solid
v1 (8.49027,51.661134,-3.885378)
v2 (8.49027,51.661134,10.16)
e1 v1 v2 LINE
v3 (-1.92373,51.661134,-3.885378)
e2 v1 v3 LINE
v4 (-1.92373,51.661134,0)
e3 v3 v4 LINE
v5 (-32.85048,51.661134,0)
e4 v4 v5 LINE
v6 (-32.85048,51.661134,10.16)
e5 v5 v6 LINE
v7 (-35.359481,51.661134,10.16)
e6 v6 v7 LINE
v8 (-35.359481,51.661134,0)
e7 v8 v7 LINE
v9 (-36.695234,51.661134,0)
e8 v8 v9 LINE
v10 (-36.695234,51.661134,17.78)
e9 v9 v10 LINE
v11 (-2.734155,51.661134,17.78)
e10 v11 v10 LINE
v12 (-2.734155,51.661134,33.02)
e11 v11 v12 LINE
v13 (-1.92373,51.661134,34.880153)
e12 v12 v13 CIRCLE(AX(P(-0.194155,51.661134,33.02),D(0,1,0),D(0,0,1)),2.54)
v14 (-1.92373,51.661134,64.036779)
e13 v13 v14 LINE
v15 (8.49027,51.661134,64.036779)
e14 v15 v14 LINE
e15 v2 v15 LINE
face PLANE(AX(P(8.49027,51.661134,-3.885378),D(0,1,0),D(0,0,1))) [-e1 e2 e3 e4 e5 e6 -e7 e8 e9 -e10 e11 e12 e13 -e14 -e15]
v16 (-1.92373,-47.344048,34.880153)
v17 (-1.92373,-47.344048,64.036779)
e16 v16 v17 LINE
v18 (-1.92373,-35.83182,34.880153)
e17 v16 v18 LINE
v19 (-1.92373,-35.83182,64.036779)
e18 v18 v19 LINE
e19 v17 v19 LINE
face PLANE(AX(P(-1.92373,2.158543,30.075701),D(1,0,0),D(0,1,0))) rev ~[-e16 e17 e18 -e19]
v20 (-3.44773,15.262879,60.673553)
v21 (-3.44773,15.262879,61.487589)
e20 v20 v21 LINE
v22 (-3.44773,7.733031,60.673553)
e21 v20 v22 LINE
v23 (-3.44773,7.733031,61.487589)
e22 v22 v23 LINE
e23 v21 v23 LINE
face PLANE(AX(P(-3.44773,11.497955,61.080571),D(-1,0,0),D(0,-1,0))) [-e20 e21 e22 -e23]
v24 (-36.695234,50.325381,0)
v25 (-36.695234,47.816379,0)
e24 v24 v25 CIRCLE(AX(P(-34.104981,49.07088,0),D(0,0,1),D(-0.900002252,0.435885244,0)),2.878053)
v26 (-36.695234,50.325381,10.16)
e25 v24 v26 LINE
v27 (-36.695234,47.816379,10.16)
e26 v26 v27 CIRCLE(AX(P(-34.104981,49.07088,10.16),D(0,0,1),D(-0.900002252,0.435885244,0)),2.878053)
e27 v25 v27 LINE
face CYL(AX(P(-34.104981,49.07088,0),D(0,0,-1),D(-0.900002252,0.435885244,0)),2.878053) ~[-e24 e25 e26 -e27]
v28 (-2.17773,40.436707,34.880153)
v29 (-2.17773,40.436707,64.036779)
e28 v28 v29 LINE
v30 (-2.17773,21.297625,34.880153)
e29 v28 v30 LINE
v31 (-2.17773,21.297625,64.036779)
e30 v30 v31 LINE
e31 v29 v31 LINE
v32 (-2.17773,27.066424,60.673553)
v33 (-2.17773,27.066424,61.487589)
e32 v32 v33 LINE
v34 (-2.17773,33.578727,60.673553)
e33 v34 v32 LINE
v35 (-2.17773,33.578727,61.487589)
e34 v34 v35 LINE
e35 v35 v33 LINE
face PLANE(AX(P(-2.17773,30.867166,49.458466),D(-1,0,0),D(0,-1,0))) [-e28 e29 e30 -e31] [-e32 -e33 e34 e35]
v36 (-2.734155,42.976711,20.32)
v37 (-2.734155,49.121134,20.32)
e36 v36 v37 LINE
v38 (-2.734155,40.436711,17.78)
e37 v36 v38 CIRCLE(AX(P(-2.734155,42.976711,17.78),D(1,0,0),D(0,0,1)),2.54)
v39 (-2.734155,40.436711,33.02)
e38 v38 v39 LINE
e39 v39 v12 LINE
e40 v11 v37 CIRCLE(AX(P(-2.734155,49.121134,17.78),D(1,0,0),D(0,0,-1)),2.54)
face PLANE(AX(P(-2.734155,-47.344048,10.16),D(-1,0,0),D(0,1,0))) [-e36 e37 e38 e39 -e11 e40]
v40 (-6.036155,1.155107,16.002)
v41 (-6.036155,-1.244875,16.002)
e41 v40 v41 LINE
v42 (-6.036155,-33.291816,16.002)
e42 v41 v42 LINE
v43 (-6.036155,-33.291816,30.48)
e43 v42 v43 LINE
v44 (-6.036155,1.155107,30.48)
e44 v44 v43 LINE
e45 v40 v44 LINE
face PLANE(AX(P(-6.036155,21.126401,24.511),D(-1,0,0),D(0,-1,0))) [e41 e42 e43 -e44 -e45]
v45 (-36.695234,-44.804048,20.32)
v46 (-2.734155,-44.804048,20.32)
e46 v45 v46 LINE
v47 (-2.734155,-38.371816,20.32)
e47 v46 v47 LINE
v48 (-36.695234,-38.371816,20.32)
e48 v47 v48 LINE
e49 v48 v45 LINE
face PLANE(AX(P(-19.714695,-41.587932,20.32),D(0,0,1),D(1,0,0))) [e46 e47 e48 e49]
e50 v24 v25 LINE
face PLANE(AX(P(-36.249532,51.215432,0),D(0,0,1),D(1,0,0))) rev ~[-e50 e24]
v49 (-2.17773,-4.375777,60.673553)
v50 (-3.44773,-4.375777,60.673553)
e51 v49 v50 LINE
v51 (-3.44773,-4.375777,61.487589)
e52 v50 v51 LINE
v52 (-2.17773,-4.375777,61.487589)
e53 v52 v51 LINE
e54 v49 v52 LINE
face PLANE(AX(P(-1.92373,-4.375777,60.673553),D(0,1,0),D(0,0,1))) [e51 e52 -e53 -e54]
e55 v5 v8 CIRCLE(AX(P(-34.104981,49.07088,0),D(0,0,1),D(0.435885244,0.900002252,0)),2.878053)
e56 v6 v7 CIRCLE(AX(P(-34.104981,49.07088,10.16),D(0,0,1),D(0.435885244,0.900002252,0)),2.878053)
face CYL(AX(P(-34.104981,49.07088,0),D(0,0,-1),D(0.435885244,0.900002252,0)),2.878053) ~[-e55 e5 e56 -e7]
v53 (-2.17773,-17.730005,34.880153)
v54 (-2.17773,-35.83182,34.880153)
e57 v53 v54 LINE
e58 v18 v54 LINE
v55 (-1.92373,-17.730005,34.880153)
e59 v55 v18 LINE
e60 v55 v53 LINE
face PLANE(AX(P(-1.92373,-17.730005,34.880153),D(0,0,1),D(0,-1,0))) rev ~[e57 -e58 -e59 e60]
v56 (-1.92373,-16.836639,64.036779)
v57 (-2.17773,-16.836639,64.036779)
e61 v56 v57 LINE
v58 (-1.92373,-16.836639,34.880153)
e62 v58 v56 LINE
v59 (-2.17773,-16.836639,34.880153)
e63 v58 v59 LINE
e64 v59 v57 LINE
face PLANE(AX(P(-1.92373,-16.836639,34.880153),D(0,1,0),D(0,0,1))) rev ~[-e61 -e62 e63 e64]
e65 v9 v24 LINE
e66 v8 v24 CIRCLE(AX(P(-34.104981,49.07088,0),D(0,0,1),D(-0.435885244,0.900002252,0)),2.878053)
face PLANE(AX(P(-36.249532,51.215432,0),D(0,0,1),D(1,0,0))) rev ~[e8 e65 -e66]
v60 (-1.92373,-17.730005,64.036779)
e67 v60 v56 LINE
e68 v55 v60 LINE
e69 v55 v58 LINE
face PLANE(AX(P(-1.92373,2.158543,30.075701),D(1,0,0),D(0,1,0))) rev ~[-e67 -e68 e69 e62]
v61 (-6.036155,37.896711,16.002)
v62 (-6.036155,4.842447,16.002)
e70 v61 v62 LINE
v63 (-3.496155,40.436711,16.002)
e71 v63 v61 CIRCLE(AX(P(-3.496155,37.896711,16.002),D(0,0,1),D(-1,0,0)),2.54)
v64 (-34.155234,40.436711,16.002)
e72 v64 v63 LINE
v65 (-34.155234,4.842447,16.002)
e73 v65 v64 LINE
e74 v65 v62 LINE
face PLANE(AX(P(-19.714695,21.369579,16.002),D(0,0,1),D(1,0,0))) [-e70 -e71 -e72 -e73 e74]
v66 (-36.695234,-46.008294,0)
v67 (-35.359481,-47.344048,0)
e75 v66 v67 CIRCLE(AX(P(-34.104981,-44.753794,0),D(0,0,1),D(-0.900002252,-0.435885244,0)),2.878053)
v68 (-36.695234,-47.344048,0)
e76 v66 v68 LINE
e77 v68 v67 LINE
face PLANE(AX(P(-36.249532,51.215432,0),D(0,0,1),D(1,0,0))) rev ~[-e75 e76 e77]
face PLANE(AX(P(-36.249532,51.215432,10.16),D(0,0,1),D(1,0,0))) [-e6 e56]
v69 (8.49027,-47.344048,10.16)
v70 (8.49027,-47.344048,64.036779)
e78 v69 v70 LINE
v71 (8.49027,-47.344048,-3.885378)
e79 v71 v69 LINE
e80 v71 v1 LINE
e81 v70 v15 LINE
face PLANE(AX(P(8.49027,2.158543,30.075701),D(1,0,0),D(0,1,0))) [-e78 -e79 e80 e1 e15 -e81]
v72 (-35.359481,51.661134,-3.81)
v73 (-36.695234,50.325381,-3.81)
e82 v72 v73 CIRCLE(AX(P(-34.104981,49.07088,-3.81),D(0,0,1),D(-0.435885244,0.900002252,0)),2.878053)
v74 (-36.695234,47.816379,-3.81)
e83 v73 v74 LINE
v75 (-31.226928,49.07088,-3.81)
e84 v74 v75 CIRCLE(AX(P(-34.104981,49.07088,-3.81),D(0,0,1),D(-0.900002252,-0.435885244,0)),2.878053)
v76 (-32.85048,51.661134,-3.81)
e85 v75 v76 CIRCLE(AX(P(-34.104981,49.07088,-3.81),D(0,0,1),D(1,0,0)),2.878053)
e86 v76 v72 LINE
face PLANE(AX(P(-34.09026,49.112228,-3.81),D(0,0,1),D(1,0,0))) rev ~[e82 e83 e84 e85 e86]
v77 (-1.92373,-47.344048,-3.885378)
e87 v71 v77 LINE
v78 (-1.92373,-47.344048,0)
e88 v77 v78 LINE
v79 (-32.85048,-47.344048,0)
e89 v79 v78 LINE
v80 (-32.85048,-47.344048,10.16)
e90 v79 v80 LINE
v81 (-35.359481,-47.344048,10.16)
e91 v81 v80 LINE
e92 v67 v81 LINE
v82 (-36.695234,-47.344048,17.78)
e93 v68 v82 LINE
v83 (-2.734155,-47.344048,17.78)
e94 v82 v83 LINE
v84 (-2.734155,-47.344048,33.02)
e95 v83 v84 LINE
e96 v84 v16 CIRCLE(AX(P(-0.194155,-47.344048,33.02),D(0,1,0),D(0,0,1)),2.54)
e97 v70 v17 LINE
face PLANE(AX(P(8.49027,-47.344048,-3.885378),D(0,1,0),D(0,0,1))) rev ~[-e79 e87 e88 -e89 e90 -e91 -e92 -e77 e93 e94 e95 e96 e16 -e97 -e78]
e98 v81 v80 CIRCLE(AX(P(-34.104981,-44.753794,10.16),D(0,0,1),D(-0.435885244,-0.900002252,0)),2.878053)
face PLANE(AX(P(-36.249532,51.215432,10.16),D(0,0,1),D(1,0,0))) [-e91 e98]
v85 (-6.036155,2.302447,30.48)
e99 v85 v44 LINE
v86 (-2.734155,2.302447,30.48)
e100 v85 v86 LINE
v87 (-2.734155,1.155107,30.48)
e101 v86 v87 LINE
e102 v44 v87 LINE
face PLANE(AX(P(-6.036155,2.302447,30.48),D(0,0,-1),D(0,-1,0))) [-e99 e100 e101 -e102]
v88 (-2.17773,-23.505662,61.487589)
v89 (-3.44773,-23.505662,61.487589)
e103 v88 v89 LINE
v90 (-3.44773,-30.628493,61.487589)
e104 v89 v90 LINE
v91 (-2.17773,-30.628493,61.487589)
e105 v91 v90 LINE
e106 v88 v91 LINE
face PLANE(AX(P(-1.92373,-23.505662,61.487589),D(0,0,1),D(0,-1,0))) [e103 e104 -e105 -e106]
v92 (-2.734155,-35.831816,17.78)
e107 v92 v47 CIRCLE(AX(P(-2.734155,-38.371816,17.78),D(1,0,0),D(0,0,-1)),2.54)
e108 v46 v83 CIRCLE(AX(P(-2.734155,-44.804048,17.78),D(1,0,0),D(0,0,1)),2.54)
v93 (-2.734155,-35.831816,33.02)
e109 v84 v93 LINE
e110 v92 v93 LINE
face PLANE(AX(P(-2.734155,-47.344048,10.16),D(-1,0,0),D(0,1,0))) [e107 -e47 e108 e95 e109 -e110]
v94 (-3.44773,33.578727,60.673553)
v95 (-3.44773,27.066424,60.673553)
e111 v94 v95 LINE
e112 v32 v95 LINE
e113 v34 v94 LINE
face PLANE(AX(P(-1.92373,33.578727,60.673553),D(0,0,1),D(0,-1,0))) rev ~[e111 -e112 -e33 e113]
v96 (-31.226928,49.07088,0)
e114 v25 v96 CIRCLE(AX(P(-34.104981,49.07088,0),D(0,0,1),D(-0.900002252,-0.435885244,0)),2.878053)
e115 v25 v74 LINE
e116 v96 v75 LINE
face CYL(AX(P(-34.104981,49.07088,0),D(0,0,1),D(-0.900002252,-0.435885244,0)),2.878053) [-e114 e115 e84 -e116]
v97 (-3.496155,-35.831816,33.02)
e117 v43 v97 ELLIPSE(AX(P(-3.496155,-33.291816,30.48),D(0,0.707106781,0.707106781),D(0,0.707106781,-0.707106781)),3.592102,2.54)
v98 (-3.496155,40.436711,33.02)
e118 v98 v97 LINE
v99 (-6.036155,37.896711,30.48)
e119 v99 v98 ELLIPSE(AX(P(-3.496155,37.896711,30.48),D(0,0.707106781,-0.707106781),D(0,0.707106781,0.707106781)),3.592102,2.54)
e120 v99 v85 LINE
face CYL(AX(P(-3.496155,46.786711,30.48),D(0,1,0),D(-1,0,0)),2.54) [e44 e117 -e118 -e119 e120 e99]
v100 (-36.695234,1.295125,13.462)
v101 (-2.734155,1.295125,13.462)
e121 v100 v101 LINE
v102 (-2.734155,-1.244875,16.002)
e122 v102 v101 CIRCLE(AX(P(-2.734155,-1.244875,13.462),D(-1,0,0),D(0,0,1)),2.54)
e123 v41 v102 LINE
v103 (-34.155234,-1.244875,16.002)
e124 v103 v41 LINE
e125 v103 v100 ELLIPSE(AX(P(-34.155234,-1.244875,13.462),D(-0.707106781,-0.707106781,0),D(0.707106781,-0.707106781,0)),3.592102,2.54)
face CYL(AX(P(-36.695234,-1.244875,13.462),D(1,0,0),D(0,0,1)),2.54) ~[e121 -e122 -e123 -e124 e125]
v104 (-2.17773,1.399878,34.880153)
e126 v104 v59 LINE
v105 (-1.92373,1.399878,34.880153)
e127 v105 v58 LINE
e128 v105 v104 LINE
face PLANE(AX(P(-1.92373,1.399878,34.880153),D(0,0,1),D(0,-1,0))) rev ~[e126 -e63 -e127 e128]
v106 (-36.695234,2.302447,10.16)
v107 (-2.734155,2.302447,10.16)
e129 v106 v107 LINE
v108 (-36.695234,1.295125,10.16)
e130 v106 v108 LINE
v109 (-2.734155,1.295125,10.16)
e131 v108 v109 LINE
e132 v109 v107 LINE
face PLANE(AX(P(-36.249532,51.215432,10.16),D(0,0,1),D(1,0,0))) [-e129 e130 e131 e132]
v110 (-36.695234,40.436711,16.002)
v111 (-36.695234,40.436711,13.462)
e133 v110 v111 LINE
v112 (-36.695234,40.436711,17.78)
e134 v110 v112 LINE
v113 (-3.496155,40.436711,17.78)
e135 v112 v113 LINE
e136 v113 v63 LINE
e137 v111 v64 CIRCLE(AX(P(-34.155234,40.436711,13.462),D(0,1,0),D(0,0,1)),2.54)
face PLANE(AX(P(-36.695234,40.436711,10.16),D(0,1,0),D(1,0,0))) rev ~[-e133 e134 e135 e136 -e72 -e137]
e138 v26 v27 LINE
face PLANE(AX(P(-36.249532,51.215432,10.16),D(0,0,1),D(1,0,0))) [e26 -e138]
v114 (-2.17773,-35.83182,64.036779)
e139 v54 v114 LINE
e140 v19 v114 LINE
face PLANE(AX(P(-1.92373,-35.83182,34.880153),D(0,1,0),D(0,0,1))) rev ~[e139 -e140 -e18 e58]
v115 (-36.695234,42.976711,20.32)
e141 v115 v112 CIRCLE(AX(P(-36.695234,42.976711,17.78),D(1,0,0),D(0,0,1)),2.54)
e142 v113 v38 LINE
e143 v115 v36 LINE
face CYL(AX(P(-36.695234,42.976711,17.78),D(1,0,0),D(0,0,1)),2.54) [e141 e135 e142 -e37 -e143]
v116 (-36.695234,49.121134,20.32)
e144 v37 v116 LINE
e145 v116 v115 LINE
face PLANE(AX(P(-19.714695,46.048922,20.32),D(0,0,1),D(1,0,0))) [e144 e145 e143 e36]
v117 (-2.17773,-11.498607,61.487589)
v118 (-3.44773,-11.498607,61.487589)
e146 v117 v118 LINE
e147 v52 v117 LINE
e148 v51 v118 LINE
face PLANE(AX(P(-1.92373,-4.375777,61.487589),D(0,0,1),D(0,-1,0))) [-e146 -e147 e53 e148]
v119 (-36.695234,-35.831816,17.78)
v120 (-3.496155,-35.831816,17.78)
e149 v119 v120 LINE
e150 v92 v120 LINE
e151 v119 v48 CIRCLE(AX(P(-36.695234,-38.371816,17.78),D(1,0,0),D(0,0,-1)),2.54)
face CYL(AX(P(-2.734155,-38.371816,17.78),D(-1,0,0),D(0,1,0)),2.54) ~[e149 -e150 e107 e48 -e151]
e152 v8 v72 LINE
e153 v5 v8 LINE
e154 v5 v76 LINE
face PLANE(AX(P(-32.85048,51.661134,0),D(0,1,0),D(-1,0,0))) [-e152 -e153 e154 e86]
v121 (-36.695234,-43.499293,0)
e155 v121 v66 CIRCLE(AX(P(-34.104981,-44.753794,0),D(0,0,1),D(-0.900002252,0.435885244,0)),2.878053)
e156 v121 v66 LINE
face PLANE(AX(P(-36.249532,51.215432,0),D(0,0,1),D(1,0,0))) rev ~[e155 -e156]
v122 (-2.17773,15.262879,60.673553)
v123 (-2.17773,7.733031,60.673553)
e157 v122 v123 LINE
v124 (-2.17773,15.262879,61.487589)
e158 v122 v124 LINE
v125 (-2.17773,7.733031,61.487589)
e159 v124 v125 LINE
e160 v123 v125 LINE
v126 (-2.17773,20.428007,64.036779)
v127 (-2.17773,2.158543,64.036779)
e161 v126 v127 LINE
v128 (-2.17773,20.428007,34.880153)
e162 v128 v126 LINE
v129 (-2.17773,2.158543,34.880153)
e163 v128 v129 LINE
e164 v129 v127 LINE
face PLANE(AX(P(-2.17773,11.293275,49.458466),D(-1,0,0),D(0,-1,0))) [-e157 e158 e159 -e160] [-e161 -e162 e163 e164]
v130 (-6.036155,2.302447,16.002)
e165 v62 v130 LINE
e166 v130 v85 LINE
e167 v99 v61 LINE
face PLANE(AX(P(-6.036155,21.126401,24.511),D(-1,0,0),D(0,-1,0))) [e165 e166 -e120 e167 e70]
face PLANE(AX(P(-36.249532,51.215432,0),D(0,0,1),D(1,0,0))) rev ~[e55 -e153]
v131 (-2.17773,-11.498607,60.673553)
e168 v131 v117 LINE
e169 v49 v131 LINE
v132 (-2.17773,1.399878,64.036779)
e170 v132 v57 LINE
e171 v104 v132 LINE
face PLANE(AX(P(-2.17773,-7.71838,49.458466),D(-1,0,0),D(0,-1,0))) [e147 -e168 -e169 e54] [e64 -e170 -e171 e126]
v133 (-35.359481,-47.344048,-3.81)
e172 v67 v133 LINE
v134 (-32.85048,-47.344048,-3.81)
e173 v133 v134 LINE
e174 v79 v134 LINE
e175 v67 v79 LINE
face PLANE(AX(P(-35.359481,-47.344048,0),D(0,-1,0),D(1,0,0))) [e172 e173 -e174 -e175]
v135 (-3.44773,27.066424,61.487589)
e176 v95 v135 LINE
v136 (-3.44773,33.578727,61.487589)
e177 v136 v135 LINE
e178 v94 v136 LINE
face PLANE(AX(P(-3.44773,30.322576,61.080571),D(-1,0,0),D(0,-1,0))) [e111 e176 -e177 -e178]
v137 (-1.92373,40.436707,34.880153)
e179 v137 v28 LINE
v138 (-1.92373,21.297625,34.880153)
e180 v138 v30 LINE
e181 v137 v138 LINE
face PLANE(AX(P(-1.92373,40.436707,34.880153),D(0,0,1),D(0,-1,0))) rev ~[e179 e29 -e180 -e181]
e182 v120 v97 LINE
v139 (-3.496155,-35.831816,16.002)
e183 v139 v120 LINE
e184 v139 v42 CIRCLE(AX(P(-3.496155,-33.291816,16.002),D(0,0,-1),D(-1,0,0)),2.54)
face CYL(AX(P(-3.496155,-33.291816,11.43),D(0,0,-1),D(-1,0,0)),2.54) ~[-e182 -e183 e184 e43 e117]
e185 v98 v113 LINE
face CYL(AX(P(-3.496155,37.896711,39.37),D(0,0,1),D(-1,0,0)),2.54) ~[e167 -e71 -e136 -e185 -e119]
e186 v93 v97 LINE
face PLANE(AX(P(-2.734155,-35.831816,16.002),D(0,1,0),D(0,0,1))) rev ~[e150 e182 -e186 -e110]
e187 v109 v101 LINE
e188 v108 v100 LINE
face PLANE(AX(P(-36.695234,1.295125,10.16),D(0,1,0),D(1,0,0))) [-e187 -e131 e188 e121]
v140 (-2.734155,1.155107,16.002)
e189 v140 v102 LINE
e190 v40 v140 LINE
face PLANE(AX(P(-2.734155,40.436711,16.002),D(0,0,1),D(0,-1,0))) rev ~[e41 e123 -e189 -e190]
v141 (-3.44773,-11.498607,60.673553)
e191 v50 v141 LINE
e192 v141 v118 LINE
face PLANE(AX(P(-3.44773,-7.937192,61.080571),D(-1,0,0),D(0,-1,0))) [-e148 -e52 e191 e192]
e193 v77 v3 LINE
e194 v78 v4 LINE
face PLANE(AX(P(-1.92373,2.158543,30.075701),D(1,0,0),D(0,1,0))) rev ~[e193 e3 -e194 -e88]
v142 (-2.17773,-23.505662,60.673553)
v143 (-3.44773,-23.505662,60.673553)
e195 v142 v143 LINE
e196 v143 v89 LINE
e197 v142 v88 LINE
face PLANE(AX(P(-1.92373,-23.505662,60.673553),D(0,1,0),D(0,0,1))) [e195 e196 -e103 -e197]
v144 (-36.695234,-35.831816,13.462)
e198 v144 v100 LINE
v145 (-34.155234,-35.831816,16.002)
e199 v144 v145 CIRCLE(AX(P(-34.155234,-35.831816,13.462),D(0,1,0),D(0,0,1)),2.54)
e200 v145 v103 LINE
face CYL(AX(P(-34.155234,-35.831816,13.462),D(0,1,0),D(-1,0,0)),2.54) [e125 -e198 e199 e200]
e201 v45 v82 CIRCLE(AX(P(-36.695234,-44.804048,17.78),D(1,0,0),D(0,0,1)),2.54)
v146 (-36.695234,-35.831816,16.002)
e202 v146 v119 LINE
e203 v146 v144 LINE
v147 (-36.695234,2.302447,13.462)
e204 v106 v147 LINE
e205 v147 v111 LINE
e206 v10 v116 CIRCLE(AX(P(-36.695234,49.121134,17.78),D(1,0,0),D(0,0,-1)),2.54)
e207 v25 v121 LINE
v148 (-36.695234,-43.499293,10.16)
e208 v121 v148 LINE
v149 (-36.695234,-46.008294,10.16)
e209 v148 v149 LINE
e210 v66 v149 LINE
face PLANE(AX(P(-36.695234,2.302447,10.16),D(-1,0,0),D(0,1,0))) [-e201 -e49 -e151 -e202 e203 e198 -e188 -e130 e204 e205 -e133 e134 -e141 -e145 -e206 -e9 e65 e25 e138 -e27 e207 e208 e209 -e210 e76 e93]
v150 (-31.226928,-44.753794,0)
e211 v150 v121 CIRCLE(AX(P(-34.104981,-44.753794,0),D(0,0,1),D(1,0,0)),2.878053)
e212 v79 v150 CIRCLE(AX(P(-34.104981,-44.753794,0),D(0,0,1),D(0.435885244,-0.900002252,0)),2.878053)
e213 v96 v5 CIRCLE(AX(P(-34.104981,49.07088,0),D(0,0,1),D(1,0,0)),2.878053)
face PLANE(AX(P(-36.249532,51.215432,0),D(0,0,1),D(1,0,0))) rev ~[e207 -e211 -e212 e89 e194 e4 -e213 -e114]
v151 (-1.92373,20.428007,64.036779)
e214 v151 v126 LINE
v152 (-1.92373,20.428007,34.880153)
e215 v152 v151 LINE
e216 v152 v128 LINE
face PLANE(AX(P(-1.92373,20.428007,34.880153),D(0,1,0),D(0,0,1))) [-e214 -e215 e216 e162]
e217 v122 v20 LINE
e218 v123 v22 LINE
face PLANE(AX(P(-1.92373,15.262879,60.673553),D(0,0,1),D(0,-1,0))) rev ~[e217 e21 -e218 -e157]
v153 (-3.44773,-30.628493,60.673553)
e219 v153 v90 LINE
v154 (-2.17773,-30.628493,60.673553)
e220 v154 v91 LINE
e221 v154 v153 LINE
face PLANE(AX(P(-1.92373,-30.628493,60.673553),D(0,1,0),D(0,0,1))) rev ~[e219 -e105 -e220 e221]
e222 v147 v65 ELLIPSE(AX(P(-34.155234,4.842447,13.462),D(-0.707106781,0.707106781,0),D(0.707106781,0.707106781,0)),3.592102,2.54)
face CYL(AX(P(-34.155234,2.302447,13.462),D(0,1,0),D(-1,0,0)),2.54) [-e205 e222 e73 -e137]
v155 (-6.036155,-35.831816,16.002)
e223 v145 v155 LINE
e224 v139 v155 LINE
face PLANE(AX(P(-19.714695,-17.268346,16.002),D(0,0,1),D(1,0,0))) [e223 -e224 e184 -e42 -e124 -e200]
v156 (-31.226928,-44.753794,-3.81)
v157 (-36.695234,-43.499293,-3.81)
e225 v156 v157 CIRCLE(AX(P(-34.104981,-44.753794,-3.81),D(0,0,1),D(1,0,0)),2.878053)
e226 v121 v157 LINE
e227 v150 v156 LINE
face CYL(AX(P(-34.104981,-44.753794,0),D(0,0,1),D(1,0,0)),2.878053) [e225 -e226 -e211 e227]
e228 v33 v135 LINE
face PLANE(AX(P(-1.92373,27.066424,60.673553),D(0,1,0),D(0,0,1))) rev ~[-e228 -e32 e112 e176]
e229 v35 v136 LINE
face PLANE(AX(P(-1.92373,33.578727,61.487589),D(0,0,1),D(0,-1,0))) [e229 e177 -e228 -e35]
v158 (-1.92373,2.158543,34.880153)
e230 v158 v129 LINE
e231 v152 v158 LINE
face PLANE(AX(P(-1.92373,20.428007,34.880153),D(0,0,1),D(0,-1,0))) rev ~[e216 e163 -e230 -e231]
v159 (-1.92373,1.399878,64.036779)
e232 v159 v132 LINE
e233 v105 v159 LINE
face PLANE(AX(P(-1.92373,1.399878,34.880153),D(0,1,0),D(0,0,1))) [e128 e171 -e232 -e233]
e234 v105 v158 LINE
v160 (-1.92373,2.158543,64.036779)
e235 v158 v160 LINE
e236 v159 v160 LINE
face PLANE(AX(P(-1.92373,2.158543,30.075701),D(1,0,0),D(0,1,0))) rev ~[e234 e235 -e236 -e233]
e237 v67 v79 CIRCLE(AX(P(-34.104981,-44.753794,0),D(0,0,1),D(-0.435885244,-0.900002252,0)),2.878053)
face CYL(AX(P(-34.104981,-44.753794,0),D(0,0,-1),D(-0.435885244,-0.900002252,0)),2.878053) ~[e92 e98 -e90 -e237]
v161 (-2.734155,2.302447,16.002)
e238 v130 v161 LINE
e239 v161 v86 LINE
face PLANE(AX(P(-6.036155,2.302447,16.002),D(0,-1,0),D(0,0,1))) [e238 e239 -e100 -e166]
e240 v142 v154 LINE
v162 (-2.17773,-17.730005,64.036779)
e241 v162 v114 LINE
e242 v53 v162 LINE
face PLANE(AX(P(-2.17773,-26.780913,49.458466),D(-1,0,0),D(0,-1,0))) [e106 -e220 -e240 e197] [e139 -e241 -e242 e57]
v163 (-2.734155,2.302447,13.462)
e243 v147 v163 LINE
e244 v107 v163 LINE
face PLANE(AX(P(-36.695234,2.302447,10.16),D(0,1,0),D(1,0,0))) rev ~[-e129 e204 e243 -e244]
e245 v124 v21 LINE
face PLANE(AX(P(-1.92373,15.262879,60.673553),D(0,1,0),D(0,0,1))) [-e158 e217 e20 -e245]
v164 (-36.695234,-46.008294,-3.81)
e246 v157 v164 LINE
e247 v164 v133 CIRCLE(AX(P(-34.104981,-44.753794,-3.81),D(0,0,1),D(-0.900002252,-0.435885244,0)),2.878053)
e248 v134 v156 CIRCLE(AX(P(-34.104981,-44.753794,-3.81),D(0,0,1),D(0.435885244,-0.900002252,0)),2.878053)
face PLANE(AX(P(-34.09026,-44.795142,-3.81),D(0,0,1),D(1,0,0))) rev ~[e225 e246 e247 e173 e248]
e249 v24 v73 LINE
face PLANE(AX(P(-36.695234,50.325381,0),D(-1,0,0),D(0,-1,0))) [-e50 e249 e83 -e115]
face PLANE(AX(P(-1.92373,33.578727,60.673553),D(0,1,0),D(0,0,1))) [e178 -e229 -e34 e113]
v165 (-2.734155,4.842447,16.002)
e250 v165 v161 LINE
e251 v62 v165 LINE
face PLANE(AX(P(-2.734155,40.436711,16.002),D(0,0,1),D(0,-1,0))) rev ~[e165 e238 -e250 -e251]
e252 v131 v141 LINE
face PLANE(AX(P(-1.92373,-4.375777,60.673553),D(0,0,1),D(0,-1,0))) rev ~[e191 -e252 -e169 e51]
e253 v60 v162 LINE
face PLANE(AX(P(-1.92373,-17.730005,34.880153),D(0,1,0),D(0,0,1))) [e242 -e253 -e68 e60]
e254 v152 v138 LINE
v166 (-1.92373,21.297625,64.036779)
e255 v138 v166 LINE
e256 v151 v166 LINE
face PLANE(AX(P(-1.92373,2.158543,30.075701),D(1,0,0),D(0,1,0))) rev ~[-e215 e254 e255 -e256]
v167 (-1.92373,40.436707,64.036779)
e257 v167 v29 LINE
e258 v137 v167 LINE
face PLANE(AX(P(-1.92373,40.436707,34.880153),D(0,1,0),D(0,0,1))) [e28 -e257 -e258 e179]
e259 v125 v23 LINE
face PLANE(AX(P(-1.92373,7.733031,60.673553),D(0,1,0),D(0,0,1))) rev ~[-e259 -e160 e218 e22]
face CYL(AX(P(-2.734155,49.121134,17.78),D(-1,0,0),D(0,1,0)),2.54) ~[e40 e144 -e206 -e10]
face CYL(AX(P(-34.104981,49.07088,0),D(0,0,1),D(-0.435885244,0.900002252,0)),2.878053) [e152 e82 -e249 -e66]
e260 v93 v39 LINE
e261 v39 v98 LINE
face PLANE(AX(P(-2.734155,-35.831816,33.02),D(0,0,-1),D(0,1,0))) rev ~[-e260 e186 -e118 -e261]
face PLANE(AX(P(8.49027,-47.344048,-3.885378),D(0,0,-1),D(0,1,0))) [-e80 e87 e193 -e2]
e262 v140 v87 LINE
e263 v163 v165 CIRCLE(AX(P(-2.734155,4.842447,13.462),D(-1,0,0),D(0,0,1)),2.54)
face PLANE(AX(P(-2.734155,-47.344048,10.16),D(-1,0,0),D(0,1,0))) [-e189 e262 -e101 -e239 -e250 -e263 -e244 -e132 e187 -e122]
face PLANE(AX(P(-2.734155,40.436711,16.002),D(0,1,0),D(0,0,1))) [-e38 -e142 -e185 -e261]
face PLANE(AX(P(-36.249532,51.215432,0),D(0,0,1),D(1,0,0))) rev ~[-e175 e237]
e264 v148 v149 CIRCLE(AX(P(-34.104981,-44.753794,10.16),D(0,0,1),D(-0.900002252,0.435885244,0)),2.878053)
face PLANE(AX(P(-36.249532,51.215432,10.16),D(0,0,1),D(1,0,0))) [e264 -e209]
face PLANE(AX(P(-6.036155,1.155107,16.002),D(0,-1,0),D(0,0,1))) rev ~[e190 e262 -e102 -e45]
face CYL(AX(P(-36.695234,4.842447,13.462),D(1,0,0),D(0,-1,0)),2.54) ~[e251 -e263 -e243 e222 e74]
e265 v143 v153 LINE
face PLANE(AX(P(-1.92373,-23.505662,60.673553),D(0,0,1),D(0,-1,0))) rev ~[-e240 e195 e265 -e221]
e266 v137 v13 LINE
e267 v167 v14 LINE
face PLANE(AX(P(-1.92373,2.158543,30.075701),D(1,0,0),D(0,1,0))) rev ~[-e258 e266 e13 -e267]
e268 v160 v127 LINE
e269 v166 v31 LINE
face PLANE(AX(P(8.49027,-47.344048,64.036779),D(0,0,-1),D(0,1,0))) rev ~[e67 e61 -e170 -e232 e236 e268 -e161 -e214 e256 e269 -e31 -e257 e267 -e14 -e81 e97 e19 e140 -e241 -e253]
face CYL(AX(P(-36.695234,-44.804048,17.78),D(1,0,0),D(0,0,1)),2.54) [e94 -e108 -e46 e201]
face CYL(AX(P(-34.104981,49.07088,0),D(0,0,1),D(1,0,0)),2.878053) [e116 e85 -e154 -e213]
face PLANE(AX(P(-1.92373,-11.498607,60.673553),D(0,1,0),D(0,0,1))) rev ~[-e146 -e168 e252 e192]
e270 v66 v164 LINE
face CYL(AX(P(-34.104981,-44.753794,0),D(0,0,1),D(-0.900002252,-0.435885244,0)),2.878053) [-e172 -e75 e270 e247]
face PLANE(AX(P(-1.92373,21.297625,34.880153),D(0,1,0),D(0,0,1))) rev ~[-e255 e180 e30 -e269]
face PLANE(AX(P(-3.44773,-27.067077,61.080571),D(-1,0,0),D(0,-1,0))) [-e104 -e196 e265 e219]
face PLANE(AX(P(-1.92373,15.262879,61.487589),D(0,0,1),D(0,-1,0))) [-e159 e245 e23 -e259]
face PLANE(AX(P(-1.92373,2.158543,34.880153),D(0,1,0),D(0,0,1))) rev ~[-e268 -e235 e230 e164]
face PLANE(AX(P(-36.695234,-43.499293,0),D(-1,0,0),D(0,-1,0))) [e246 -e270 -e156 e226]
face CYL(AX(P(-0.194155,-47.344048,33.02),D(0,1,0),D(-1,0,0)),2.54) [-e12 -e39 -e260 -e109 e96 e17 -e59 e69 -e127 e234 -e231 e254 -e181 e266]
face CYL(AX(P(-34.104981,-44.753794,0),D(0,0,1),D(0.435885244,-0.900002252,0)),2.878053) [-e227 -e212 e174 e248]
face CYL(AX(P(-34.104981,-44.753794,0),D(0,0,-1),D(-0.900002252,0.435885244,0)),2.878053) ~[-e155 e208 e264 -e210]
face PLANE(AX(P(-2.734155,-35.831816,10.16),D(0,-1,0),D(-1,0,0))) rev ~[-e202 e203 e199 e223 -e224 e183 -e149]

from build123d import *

# Parameters (mm, degrees)
F0_W          = 22.5927522406
F0_H          = 49.5025906712
F1_DEPTH      = 10.16
F2_DEPTH      = 3.81
F3_W          = 11.2244246993
F3_H          = 99.0051813424
F4_DEPTH      = 25.4
F6_DEPTH      = 10.16
F7_R          = 2.54
F8_W          = 33.9610797819
F8_H          = 38.1342638284
F8_H_2        = 37.1269418392
F9_DEPTH      = 5.842
F10_R         = 2.54
F11_W         = 99.0051813424
F11_H         = 67.9221570026
F12_DEPTH     = 10.414
F13_W         = 38.620619569
F13_H         = 17.018
F13_W_2       = 37.6479080878
F14_DEPTH     = 3.302
F15_T1_DEPTH  = 88.9685276568
F15_T6_DEPTH  = 27.94
F15_T11_DEPTH = 27.94
F16_W         = 1.1473407503
F16_H         = 14.478
F17_DEPTH     = 3.302
F18_W         = 19.139082171
F18_H         = 29.1566260799
F18_W_2       = 6.5123029053
F18_H_2       = 0.8140355349
F18_W_3       = 18.2694643736
F18_W_4       = 7.5298482552
F18_W_5       = 18.2365168585
F18_W_6       = 7.1228295565
F18_W_7       = 18.1018151343
F18_W_8       = 7.1228314191
F19_DEPTH     = 0.254
F20_DEPTH     = 1.524


# Not quite as in the source:
# - a fillet or chamfer that OpenCascade refuses, or shapes differently, is made with other operations: its cross-section is extruded or revolved along the edge and cut away or added
# - a feature names something its author has since deleted; it is built from what else it names


with BuildPart() as f1:
    # F0 (on Top) → F1 (new body)
    with BuildSketch(Plane.XY):
        with BuildLine():
            Line((-35.3594812499, 51.6611337662), (-36.6952344775, 51.6611337662))
            Line((-36.6952344775, 51.6611337662), (-36.6952344775, 50.3253805386))
            ThreePointArc((-36.6952344775, 50.3253805386), (-36.1400711383, 51.105970427), (-35.3594812499, 51.6611337662))
        make_face()
        with BuildLine():
            ThreePointArc((-32.8504798068, 51.6611337662), (-34.1049805284, 51.9489325583), (-35.3594812499, 51.6611337662))
            Line((-35.3594812499, 51.6611337662), (-32.8504798068, 51.6611337662))
        make_face()
        with BuildLine():
            Line((-32.8504798068, 51.6611337662), (-35.3594812499, 51.6611337662))
            ThreePointArc((-35.3594812499, 51.6611337662), (-36.1400711383, 51.105970427), (-36.6952344775, 50.3253805386))
            Line((-36.6952344775, 50.3253805386), (-36.6952344775, 47.8163790954))
            ThreePointArc((-36.6952344775, 47.8163790954), (-33.4614356183, 46.2656993361), (-31.2269277871, 49.070879817))
            ThreePointArc((-31.2269277871, 49.070879817), (-31.6663634179, 50.5993869876), (-32.8504798068, 51.6611337662))
        make_face()
        with BuildLine():
            Line((-36.6952344775, 47.8163790954), (-36.6952344775, 50.3253805386))
            ThreePointArc((-36.6952344775, 50.3253805386), (-36.9830332696, 49.070879817), (-36.6952344775, 47.8163790954))
        make_face()
        with BuildLine():
            Line((-14.1024822369, 51.6611337662), (-32.8504798068, 51.6611337662))
            ThreePointArc((-32.8504798068, 51.6611337662), (-31.6663634179, 50.5993869876), (-31.2269277871, 49.070879817))
            ThreePointArc((-31.2269277871, 49.070879817), (-33.4614356183, 46.2656993361), (-36.6952344775, 47.8163790954))
            Line((-36.6952344775, 47.8163790954), (-36.6952344775, 2.158543095))
            Line((-36.6952344775, 2.158543095), (-14.1024822369, 2.158543095))
            Line((-14.1024822369, 2.158543095), (-14.1024822369, 51.6611337662))
        make_face()
        with Locations((-2.8061061166, 26.9098384306)):
            Rectangle(F0_W, F0_H)
        with BuildLine():
            Line((-14.1024822369, 2.158543095), (-36.6952344775, 2.158543095))
            Line((-36.6952344775, 2.158543095), (-36.6952344775, -43.4992929054))
            ThreePointArc((-36.6952344775, -43.4992929054), (-33.4614356183, -41.9486131461), (-31.2269277871, -44.753793627))
            ThreePointArc((-31.2269277871, -44.753793627), (-31.6663634179, -46.2823007976), (-32.8504798068, -47.3440475762))
            Line((-32.8504798068, -47.3440475762), (-14.1024822369, -47.3440475762))
            Line((-14.1024822369, -47.3440475762), (-14.1024822369, 2.158543095))
        make_face()
        with Locations((-2.8061061166, -22.5927522406)):
            Rectangle(F0_W, F0_H)
        with BuildLine():
            ThreePointArc((-31.2269277871, -44.753793627), (-33.4614356183, -41.9486131461), (-36.6952344775, -43.4992929054))
            Line((-36.6952344775, -43.4992929054), (-36.6952344775, -46.0082943486))
            ThreePointArc((-36.6952344775, -46.0082943486), (-36.1400711383, -46.788884237), (-35.3594812499, -47.3440475762))
            Line((-35.3594812499, -47.3440475762), (-32.8504798068, -47.3440475762))
            ThreePointArc((-32.8504798068, -47.3440475762), (-31.6663634179, -46.2823007976), (-31.2269277871, -44.753793627))
        make_face()
        with BuildLine():
            Line((-36.6952344775, -46.0082943486), (-36.6952344775, -43.4992929054))
            ThreePointArc((-36.6952344775, -43.4992929054), (-36.9830332696, -44.753793627), (-36.6952344775, -46.0082943486))
        make_face()
        with BuildLine():
            ThreePointArc((-35.3594812499, -47.3440475762), (-36.1400711383, -46.788884237), (-36.6952344775, -46.0082943486))
            Line((-36.6952344775, -46.0082943486), (-36.6952344775, -47.3440475762))
            Line((-36.6952344775, -47.3440475762), (-35.3594812499, -47.3440475762))
        make_face()
        with BuildLine():
            ThreePointArc((-35.3594812499, -47.3440475762), (-34.1049805284, -47.6318463683), (-32.8504798068, -47.3440475762))
            Line((-32.8504798068, -47.3440475762), (-35.3594812499, -47.3440475762))
        make_face()
    extrude(amount=F1_DEPTH)

    # F0 (on Top) → F2 (join)
    with BuildSketch(Plane.XY):
        with BuildLine():
            Line((-32.8504798068, 51.6611337662), (-35.3594812499, 51.6611337662))
            ThreePointArc((-35.3594812499, 51.6611337662), (-36.1400711383, 51.105970427), (-36.6952344775, 50.3253805386))
            Line((-36.6952344775, 50.3253805386), (-36.6952344775, 47.8163790954))
            ThreePointArc((-36.6952344775, 47.8163790954), (-33.4614356183, 46.2656993361), (-31.2269277871, 49.070879817))
            ThreePointArc((-31.2269277871, 49.070879817), (-31.6663634179, 50.5993869876), (-32.8504798068, 51.6611337662))
        make_face()
        with BuildLine():
            ThreePointArc((-31.2269277871, -44.753793627), (-33.4614356183, -41.9486131461), (-36.6952344775, -43.4992929054))
            Line((-36.6952344775, -43.4992929054), (-36.6952344775, -46.0082943486))
            ThreePointArc((-36.6952344775, -46.0082943486), (-36.1400711383, -46.788884237), (-35.3594812499, -47.3440475762))
            Line((-35.3594812499, -47.3440475762), (-32.8504798068, -47.3440475762))
            ThreePointArc((-32.8504798068, -47.3440475762), (-31.6663634179, -46.2823007976), (-31.2269277871, -44.753793627))
        make_face()
    extrude(amount=-F2_DEPTH)

    # F3 (on face) → F4 (join)
    with BuildSketch(Plane.XY.offset(10.16)):
        with Locations((2.878057654, 2.158543095)):
            Rectangle(F3_W, F3_H)
    extrude(amount=F4_DEPTH)

    # F5 (on face) → F6 (join)
    with BuildSketch(Plane.XY.offset(10.16)):
        Polygon((-2.7341546956, 40.4367111623), (-2.7341546956, 51.6611337662), (-32.8504798068, 51.6611337662), (-35.3594812499, 51.6611337662), (-36.6952344775, 51.6611337662), (-36.6952344775, 50.3253805386), (-36.6952344775, 47.8163790954), (-36.6952344775, 40.4367111623), align=None)
        Polygon((-2.7341546956, -47.3440475762), (-2.7341546956, -35.8318164945), (-36.6952344775, -35.8318164945), (-36.6952344775, -43.4992929054), (-36.6952344775, -46.0082943486), (-36.6952344775, -47.3440475762), (-35.3594812499, -47.3440475762), (-32.8504798068, -47.3440475762), align=None)
    extrude(amount=F6_DEPTH)

    # F7
    f7_edges = [f1.edges().sort_by_distance(p)[0] for p in [
        (-2.734155, 2.158543, 35.56),
        (-19.714695, -35.831816, 20.32),
        (-19.714695, -47.344048, 20.32),
        (-19.714695, 51.661134, 20.32),
        (-19.714695, 40.436711, 20.32),
    ]]
    fillet(f7_edges, radius=F7_R)

    # F8 (on face) → F9 (join)
    with BuildSketch(Plane.XY.offset(10.16)):
        with Locations((-19.7146945866, 21.3695792481)):
            Rectangle(F8_W, F8_H)
        with Locations((-19.7146945866, -17.2683455748)):
            Rectangle(F8_W, F8_H_2)
    extrude(amount=F9_DEPTH)

    # F10
    f10_edges = [f1.edges().sort_by_distance(p)[0] for p in [
        (-19.714695, 1.295125, 16.002),
        (-19.714695, 2.302447, 16.002),
        (-36.695234, -17.268346, 16.002),
        (-36.695234, 21.369579, 16.002),
    ]]
    fillet(f10_edges, radius=F10_R)

    # F11 (on face) → F12 (join)
    with BuildSketch(Plane.YZ.offset(8.4902700037)):
        with Locations((2.158543095, 30.0757006044)):
            Rectangle(F11_W, F11_H)
    extrude(amount=-F12_DEPTH)

    # F13 (on face) → F14 (join)
    with BuildSketch(Plane(origin=(-2.7341546956, 0, 0), x_dir=(0, -1, 0), z_dir=(-1, 0, 0))):
        with Locations((-21.1264013778, 24.511)):
            Rectangle(F13_W, F13_H)
        with Locations((17.0078624506, 24.511)):
            Rectangle(F13_W_2, F13_H)
    extrude(amount=F14_DEPTH)

    # F15: fillet of radius 2.54 on 3 edges, made by hand

    # F15_s2 → F15_t1 (cut)
    with BuildSketch(Plane.XZ.offset(-46.7867111623)):
        with BuildLine():
            ThreePointArc((-6.0361546956, 30.48), (-5.2922059199, 32.2760512242), (-3.4961546956, 33.02))
            Line((-3.4961546956, 33.02), (-6.0361546956, 33.02))
            Line((-6.0361546956, 33.02), (-6.0361546956, 30.48))
        make_face()
    extrude(amount=F15_T1_DEPTH, mode=Mode.SUBTRACT)


with BuildPart() as f15_tool4:
    # F15_s5 → F15_t6 (new body)
    with BuildSketch(Plane.XY.offset(39.37)):
        with BuildLine():
            ThreePointArc((-6.0361546956, 37.8967111623), (-5.2922059199, 39.6927623865), (-3.4961546956, 40.4367111623))
            Line((-3.4961546956, 40.4367111623), (-6.0361546956, 40.4367111623))
            Line((-6.0361546956, 40.4367111623), (-6.0361546956, 37.8967111623))
        make_face()
    extrude(amount=-F15_T6_DEPTH)

    split(bisect_by=Plane.XY.offset(16.002), keep=Keep.TOP)


with BuildPart() as f1_1:
    add(f1.part)

    # F15_t3: cut F15_tool4
    add(f15_tool4.part, mode=Mode.SUBTRACT)


with BuildPart() as f15_tool9:
    # F15_s10 → F15_t11 (new body)
    with BuildSketch(Plane.XY.offset(11.43)):
        with BuildLine():
            ThreePointArc((-6.0361546956, -33.2918164945), (-5.2922059199, -35.0878677187), (-3.4961546956, -35.8318164945))
            Line((-3.4961546956, -35.8318164945), (-6.0361546956, -35.8318164945))
            Line((-6.0361546956, -35.8318164945), (-6.0361546956, -33.2918164945))
        make_face()
    extrude(amount=F15_T11_DEPTH)

    split(bisect_by=Plane.XY.offset(16.002), keep=Keep.TOP)


with BuildPart() as f1_2:
    add(f1_1.part)

    # F15_t8: cut F15_tool9
    add(f15_tool9.part, mode=Mode.SUBTRACT)

    # F16 (on face) → F17 (cut)
    with BuildSketch(Plane(origin=(-6.0361546956, 0, 0), x_dir=(0, -1, 0), z_dir=(-1, 0, 0))):
        with Locations((-1.7287769588, 23.241)):
            Rectangle(F16_W, F16_H)
    extrude(amount=-F17_DEPTH, mode=Mode.SUBTRACT)

    # F18 (on face) → F19 (join)
    with BuildSketch(Plane(origin=(-1.9237299963, 0, 0), x_dir=(0, -1, 0), z_dir=(-1, 0, 0))):
        with Locations((-30.8671663515, 49.4584660657)):
            Rectangle(F18_W, F18_H)
        with Locations((-30.3225759417, 61.080571264)):
            Rectangle(F18_W_2, F18_H_2, mode=Mode.SUBTRACT)
        with Locations((-11.2932752818, 49.4584660657)):
            Rectangle(F18_W_3, F18_H)
        with Locations((-11.4979553036, 61.080571264)):
            Rectangle(F18_W_4, F18_H_2, mode=Mode.SUBTRACT)
        with Locations((7.7183801332, 49.4584660657)):
            Rectangle(F18_W_5, F18_H)
        with Locations((7.9371919855, 61.080571264)):
            Rectangle(F18_W_6, F18_H_2, mode=Mode.SUBTRACT)
        with Locations((26.7809126526, 49.4584660657)):
            Rectangle(F18_W_7, F18_H)
        with Locations((27.0670773461, 61.080571264)):
            Rectangle(F18_W_8, F18_H_2, mode=Mode.SUBTRACT)
    extrude(amount=F19_DEPTH)

    # F18 (on face) → F20 (join)
    with BuildSketch(Plane(origin=(-1.9237299963, 0, 0), x_dir=(0, -1, 0), z_dir=(-1, 0, 0))):
        with Locations((27.0670773461, 61.080571264)):
            Rectangle(F18_W_8, F18_H_2)
        with Locations((7.9371919855, 61.080571264)):
            Rectangle(F18_W_6, F18_H_2)
        with Locations((-11.4979553036, 61.080571264)):
            Rectangle(F18_W_4, F18_H_2)
        with Locations((-30.3225759417, 61.080571264)):
            Rectangle(F18_W_2, F18_H_2)
    extrude(amount=F20_DEPTH)


solid = f1_2.part
